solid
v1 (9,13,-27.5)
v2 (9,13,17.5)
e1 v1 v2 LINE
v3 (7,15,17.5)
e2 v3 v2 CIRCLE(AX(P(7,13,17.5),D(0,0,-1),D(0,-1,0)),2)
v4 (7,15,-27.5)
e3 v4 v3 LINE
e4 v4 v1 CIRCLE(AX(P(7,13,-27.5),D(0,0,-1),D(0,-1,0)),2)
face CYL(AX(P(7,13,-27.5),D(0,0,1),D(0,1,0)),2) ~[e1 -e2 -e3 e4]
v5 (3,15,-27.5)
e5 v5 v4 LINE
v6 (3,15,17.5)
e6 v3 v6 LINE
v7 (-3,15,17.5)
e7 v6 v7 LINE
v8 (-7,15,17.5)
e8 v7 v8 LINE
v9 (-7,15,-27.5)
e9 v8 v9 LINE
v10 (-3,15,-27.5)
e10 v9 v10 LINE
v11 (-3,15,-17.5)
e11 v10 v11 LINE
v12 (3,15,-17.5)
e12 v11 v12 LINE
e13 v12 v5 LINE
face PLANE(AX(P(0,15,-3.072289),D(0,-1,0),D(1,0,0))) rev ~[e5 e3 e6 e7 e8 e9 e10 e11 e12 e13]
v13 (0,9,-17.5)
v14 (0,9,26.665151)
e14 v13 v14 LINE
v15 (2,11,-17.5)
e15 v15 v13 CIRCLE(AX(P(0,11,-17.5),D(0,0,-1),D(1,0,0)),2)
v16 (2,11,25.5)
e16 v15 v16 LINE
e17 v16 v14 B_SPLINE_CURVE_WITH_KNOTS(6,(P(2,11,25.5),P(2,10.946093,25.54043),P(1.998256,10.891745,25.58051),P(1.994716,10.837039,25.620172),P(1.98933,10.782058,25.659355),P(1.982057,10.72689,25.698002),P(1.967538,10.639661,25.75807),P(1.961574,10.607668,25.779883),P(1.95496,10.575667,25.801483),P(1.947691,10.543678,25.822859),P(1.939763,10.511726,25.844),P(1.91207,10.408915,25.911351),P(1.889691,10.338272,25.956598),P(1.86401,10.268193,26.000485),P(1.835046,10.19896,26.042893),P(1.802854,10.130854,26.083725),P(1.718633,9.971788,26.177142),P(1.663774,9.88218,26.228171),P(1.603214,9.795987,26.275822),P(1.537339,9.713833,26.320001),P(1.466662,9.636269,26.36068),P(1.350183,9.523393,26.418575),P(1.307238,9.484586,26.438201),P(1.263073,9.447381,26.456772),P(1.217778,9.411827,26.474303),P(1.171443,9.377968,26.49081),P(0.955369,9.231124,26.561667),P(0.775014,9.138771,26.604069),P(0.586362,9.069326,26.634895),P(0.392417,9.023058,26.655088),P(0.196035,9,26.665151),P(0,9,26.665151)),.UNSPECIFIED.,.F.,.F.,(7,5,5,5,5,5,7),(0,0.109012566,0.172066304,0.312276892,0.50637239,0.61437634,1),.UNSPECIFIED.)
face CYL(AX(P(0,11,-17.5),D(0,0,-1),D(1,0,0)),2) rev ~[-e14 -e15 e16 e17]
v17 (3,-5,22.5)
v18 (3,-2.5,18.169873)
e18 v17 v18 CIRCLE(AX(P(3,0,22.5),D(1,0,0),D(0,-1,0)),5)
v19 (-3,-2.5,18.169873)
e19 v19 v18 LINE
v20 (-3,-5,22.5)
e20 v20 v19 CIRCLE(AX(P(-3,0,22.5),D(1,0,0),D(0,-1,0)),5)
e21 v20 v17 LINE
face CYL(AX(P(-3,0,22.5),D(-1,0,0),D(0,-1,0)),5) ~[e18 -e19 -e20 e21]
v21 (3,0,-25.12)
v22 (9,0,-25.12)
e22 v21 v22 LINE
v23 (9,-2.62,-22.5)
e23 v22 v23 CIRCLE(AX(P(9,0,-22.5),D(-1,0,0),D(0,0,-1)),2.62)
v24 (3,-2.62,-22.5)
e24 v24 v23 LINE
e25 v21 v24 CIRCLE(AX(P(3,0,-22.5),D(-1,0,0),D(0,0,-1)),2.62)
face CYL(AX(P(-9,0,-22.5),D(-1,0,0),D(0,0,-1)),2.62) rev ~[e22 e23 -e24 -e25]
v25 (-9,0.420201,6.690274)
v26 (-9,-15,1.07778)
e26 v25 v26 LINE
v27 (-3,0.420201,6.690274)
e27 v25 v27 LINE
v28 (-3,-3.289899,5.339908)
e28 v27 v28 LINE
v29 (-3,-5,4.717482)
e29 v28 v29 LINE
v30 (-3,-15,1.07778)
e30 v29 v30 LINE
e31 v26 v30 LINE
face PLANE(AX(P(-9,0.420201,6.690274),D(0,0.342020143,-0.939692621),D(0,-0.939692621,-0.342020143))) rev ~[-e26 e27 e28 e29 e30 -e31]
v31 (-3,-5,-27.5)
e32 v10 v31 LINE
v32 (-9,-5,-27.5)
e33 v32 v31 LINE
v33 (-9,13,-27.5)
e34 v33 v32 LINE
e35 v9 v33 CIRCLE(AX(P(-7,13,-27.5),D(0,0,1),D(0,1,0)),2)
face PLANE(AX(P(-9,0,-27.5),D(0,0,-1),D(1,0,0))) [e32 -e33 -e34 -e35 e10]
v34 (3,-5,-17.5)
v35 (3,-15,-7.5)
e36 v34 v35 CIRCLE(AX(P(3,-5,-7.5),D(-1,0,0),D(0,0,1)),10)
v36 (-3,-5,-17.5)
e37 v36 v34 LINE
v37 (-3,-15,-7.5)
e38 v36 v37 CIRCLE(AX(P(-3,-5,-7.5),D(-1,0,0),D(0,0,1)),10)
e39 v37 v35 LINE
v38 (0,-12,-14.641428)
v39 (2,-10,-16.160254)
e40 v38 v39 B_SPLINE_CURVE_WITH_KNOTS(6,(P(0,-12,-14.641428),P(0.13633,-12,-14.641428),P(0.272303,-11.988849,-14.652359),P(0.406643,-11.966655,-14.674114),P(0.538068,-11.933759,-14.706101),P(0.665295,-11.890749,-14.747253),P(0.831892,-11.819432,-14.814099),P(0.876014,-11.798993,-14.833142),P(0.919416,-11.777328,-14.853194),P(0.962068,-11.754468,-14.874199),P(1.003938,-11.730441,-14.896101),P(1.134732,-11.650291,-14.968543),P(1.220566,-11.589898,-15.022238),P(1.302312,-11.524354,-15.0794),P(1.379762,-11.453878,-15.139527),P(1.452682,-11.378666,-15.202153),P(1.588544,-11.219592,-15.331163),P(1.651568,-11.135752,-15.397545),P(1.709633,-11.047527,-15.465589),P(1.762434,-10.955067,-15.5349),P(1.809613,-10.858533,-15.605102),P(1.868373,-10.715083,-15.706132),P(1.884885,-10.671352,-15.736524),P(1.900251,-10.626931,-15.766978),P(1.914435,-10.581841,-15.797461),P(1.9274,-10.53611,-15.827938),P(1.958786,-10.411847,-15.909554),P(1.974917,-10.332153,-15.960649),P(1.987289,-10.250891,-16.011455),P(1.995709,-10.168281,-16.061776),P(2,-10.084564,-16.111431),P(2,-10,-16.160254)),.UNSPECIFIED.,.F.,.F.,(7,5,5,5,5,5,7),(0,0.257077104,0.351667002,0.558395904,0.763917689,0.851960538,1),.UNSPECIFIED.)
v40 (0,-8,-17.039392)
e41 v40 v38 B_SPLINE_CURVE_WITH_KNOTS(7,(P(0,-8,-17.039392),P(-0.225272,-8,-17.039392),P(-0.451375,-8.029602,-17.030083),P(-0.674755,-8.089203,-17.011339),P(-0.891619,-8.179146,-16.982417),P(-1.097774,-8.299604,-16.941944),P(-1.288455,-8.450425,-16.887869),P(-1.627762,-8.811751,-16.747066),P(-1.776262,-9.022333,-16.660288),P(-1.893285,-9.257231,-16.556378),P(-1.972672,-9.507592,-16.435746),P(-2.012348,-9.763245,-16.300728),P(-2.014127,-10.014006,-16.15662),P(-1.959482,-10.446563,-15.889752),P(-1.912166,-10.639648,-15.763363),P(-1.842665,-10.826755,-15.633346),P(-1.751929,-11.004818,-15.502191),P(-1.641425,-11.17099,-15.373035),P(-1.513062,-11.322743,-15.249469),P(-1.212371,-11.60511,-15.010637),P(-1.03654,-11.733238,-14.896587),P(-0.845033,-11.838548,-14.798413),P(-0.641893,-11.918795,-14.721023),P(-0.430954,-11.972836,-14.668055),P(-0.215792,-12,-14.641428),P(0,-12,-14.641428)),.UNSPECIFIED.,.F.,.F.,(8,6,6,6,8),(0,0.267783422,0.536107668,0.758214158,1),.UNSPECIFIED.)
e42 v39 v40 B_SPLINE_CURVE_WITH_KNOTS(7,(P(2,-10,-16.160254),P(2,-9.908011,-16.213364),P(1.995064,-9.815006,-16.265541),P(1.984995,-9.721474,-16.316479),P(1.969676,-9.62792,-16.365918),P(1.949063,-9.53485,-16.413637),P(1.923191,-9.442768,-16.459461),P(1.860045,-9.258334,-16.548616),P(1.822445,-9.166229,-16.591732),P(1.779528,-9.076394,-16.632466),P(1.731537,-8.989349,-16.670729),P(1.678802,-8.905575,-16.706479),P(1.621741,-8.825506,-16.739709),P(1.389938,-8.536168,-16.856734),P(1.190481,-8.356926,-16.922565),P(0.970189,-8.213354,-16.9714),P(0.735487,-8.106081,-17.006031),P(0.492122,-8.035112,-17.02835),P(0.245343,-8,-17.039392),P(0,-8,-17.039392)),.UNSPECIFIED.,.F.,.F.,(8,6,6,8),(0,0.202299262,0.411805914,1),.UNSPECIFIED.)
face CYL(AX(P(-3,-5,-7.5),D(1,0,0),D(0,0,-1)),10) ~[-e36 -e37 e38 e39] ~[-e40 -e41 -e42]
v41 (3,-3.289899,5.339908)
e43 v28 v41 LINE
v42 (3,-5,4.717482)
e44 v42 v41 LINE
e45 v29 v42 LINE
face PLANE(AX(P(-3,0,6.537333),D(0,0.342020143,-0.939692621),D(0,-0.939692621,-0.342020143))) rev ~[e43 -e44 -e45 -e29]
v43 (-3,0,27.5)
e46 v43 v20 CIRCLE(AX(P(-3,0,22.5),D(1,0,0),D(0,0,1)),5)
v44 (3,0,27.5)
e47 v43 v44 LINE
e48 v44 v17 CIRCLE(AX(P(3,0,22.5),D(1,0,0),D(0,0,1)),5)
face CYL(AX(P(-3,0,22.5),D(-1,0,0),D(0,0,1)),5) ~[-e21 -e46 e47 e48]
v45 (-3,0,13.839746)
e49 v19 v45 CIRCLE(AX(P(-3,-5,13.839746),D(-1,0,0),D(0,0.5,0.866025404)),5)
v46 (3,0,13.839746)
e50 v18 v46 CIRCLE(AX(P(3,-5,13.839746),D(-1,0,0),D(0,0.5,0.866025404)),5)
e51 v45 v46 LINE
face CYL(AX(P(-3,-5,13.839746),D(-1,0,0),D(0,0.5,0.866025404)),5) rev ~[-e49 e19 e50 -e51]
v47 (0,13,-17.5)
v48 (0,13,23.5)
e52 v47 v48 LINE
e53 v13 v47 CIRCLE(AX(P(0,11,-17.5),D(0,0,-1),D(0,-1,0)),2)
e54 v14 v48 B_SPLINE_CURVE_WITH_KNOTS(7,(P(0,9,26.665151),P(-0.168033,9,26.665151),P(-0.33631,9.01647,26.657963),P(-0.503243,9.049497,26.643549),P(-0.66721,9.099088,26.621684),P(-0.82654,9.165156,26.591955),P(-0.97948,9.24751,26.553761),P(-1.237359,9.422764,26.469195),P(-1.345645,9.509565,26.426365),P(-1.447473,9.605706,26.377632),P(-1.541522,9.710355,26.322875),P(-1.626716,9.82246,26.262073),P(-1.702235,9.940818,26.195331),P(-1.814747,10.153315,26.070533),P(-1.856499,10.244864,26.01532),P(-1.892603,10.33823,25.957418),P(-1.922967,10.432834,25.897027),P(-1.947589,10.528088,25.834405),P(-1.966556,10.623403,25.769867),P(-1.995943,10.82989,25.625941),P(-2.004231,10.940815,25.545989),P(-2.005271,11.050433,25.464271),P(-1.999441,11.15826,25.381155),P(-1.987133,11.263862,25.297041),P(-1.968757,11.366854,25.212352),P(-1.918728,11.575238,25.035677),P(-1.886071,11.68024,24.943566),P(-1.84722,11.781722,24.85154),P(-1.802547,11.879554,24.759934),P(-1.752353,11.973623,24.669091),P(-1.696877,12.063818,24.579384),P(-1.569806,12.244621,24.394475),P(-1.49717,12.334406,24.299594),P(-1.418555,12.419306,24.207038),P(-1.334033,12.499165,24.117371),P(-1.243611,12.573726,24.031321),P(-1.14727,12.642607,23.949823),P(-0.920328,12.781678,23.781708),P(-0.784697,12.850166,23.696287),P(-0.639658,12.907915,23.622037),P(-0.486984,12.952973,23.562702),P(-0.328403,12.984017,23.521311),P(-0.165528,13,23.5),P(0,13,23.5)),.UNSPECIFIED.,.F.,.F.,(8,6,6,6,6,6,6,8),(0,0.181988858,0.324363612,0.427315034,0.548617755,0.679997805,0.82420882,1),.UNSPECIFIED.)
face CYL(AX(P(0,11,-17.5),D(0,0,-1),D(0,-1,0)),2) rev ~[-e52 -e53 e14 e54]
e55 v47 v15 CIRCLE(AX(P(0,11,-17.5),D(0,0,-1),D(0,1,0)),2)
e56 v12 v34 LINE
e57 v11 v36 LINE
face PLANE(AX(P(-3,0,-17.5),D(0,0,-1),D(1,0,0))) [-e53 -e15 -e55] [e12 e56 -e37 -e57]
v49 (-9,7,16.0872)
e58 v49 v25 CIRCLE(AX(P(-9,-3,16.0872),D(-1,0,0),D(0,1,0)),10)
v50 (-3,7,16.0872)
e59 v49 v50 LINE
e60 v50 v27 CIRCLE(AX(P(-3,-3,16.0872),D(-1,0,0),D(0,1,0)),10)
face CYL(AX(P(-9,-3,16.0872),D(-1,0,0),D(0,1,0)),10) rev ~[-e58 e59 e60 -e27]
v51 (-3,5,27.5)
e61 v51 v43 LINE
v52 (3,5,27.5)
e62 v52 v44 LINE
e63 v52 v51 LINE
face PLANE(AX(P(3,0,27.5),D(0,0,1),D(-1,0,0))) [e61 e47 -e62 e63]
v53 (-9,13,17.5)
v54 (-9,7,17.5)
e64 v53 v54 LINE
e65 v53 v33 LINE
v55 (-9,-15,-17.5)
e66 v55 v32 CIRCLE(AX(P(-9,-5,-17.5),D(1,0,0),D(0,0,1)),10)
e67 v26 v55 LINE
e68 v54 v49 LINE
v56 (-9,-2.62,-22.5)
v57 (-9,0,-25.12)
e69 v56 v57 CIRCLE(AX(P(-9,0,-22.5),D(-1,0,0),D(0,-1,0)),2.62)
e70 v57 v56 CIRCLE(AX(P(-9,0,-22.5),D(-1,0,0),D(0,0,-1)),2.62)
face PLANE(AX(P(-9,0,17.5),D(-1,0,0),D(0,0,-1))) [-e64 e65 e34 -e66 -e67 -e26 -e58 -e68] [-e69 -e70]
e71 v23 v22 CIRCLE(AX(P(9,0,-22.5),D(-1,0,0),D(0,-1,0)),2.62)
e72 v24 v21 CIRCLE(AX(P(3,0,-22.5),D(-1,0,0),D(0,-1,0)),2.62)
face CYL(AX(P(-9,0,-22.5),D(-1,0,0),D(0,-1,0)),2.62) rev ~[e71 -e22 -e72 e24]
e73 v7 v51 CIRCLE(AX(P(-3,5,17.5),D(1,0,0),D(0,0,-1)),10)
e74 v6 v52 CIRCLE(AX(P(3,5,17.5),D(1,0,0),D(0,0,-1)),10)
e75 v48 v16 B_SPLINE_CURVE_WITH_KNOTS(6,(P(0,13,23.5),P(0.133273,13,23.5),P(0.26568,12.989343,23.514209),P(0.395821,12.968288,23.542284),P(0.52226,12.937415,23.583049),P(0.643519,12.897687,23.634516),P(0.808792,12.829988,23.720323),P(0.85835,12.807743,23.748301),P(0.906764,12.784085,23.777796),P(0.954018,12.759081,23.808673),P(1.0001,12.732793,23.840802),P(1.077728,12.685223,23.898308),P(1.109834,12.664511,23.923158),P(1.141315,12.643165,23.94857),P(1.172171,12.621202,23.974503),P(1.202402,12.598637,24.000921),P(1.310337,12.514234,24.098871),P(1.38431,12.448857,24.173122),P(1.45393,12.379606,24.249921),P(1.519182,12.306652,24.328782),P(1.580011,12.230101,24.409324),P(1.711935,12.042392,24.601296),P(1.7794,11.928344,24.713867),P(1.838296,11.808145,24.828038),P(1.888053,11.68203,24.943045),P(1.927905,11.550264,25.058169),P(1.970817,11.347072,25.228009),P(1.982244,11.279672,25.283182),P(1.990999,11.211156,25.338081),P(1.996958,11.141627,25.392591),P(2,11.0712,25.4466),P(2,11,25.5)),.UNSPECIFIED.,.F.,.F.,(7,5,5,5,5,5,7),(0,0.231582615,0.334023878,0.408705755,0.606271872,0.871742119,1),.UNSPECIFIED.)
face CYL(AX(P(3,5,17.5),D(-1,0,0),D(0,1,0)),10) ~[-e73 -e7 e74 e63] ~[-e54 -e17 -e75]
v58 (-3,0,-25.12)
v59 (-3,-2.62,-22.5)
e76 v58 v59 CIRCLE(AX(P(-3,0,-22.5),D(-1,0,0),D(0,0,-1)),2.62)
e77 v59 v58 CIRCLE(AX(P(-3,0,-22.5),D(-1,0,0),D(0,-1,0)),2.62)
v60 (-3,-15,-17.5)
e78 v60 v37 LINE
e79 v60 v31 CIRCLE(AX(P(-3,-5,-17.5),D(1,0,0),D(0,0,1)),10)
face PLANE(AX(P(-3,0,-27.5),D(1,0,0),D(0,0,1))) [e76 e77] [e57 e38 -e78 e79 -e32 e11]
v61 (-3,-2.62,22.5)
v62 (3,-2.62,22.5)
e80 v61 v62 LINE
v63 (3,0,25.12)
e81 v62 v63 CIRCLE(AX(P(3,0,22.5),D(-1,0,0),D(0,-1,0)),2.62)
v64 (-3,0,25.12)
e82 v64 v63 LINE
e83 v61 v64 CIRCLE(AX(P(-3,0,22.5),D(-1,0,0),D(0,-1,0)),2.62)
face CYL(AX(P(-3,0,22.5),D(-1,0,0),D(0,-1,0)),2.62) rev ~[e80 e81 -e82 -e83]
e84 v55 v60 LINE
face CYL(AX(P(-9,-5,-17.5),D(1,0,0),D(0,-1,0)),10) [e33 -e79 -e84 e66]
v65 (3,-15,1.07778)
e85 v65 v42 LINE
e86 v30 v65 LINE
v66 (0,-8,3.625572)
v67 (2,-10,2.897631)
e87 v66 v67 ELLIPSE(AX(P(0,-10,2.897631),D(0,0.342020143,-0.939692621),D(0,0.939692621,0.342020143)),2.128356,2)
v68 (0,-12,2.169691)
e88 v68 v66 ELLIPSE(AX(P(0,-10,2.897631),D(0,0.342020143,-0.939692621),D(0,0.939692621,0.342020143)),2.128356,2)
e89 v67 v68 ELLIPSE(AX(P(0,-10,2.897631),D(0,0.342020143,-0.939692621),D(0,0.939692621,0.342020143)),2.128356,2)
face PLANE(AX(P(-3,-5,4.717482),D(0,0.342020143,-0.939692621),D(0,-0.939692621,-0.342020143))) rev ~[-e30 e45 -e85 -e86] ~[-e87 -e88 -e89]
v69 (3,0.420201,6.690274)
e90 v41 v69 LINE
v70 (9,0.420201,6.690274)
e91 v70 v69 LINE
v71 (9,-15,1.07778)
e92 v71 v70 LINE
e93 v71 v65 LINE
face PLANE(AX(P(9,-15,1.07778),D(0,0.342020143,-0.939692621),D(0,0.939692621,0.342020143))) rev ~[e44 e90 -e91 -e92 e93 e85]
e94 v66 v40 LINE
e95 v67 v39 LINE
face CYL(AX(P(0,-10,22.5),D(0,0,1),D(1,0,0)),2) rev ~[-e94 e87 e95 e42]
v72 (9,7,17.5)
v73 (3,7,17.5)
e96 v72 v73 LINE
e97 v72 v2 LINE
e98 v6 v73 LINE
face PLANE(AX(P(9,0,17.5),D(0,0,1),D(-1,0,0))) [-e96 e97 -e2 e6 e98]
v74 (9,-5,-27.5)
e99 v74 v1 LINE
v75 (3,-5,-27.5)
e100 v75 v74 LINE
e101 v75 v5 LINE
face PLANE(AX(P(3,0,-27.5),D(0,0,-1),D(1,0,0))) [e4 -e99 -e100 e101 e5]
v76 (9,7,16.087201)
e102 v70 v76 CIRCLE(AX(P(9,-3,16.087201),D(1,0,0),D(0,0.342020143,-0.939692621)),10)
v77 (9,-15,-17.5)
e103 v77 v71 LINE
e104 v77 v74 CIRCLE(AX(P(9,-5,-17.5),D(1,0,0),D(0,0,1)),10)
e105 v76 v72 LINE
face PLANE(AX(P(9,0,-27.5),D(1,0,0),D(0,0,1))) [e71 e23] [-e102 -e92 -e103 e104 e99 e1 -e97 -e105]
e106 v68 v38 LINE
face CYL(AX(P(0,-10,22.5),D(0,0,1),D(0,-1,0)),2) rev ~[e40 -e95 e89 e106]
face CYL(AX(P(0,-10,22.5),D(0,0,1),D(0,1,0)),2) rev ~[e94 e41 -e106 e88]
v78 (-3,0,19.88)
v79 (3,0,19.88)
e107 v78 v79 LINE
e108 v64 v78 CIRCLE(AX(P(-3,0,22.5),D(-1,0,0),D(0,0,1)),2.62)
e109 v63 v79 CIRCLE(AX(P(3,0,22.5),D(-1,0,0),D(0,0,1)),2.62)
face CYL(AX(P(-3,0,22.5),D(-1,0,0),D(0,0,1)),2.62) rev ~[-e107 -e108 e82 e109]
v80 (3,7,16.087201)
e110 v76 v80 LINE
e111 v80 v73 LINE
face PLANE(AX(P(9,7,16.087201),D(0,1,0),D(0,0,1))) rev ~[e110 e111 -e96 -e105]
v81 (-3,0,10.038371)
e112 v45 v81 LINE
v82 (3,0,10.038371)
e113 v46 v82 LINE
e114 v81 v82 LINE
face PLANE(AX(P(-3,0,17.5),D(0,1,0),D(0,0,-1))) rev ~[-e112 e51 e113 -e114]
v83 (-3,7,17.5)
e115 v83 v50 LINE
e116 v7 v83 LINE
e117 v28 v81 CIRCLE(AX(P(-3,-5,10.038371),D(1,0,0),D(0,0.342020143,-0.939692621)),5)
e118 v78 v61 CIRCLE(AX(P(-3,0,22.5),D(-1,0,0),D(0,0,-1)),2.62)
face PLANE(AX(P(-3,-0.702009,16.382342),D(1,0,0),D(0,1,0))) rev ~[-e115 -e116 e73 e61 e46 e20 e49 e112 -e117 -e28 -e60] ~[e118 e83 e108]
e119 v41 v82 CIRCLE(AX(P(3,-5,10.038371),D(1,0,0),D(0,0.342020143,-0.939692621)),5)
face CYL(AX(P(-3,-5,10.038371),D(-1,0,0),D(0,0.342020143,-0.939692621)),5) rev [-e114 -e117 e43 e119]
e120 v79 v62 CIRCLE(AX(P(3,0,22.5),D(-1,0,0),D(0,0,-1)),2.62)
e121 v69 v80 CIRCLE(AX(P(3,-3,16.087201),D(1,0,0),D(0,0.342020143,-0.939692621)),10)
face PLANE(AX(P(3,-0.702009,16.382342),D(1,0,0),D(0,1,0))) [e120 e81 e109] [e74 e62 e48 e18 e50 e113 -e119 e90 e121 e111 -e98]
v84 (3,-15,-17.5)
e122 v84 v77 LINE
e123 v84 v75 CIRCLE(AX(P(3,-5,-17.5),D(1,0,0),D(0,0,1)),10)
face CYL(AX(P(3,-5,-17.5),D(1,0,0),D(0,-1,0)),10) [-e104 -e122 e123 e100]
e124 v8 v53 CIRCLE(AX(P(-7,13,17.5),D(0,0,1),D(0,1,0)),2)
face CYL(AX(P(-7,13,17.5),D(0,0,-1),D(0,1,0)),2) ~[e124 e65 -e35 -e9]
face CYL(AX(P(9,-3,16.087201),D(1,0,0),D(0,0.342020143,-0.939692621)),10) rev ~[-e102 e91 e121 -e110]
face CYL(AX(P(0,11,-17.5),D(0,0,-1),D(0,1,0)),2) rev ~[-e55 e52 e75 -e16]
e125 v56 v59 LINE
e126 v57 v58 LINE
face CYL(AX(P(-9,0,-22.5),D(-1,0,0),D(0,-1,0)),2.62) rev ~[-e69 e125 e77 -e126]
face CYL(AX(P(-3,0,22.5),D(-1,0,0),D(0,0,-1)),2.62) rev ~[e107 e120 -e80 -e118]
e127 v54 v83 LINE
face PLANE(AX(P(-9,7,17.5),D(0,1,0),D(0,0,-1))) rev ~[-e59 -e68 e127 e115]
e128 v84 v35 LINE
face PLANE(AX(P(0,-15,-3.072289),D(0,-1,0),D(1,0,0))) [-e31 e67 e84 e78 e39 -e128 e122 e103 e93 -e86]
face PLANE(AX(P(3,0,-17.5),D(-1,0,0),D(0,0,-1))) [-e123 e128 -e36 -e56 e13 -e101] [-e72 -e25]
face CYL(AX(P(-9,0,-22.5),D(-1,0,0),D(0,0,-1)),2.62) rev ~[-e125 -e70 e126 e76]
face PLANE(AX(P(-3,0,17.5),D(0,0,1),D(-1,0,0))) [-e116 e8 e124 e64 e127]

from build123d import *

# Parameters (mm, degrees)
F1_DEPTH     = 15
F3_DEPTH     = 6
F5_DEPTH     = 18
F6_R         = 10
F9_DEPTH     = 6
F10_DEPTH    = 6
F11_R        = 2
F13_DEPTH    = 6
F15_R        = 10
F18_DEPTH    = 40
F20_DEPTH    = 45
F22_DEPTH    = 6
F23_T1_DEPTH = 6


# Not quite as in the source:
# - a fillet or chamfer that OpenCascade refuses, or shapes differently, is made with other operations: its cross-section is extruded or revolved along the edge and cut away or added


with BuildPart() as f1:
    # F0 (on Front) → F1 (new body, symmetric)
    with BuildSketch(Plane.XZ):
        Polygon((9, -17.5), (9, 17.5), (3, 17.5), (3, 27.5), (-3, 27.5), (-3, 17.5), (-9, 17.5), (-9, -17.5), (-9, -27.5), (-3, -27.5), (-3, -17.5), (3, -17.5), (3, -27.5), (9, -27.5), align=None)
    extrude(amount=F1_DEPTH, both=True)

    # F2 (on face) → F3 (cut)
    with BuildSketch(Plane(origin=(-3, 0, 0), x_dir=(0, -1, 0), z_dir=(-1, 0, 0))):
        with BuildLine():
            ThreePointArc((0, 25.12), (-2.62, 22.5), (0, 19.88))
            Line((0, 19.88), (0, 25.12))
        make_face()
        with BuildLine():
            Line((0, 25.12), (0, 19.88))
            ThreePointArc((0, 19.88), (1.8526197667, 20.6473802333), (2.62, 22.5))
            ThreePointArc((2.62, 22.5), (1.8526197667, 24.3526197667), (0, 25.12))
        make_face()
    extrude(amount=-F3_DEPTH, mode=Mode.SUBTRACT)

    # F4 (on face) → F5 (cut)
    with BuildSketch(Plane(origin=(-9, 0, 0), x_dir=(0, -1, 0), z_dir=(-1, 0, 0))):
        with BuildLine():
            ThreePointArc((0, -25.12), (1.8526197667, -24.3526197667), (2.62, -22.5))
            ThreePointArc((2.62, -22.5), (-1.8526197667, -20.6473802333), (0, -25.12))
        make_face()
    extrude(amount=-F5_DEPTH, mode=Mode.SUBTRACT)

    # F6
    f6_edges = [f1.edges().sort_by_distance(p)[0] for p in [
        (0, 15, 27.5),
        (0, -15, 27.5),
        (6, -15, -27.5),
        (-6, -15, -27.5),
    ]]
    fillet(f6_edges, radius=F6_R)

    # F8 (on face) → F9 (cut)
    with BuildSketch(Plane(origin=(-9, 0, 0), x_dir=(0, -1, 0), z_dir=(-1, 0, 0))):
        with BuildLine():
            ThreePointArc((-7, 16.0872004348), (-5.1915204429, 10.3514360713), (-0.4202014333, 6.690274227))
            Line((-0.4202014333, 6.690274227), (15, 1.0777798989))
            Line((15, 1.0777798989), (15, 17.5))
            Line((15, 17.5), (-7, 17.5))
            Line((-7, 17.5), (-7, 16.0872004348))
        make_face()
    extrude(amount=-F9_DEPTH, mode=Mode.SUBTRACT)

    # F7 (on face) → F10 (cut)
    with BuildSketch(Plane.YZ.offset(9)):
        with BuildLine():
            Line((7, 17.5), (-15, 17.5))
            Line((-15, 17.5), (-15, 1.07778))
            Line((-15, 1.07778), (0.4202014333, 6.6902743281))
            ThreePointArc((0.4202014333, 6.6902743281), (5.1915204429, 10.3514361724), (7, 16.087200536))
            Line((7, 16.087200536), (7, 17.5))
        make_face()
    extrude(amount=-F10_DEPTH, mode=Mode.SUBTRACT)

    # F11
    f11_edges = [f1.edges().sort_by_distance(p)[0] for p in [
        (9, 15, -5),
        (-9, 15, -5),
    ]]
    fillet(f11_edges, radius=F11_R)

    # F12 (on face) → F13 (cut)
    with BuildSketch(Plane(origin=(-3, 0, 0), x_dir=(0, -1, 0), z_dir=(-1, 0, 0))):
        with BuildLine():
            Line((5, 27.5), (0, 27.5))
            ThreePointArc((0, 27.5), (3.5355339059, 26.0355339059), (5, 22.5))
            Line((5, 22.5), (5, 4.7174822415))
            Line((5, 4.7174822415), (15, 1.0777798989))
            Line((15, 1.0777798989), (15, 17.5))
            ThreePointArc((15, 17.5), (12.0710678119, 24.5710678119), (5, 27.5))
        make_face()
    extrude(amount=-F13_DEPTH, mode=Mode.SUBTRACT)

    # F15
    f15_edges = [f1.edges().sort_by_distance(p)[0] for p in [
        (0, -15, -17.5),
    ]]
    fillet(f15_edges, radius=F15_R)

    # F17 (on face) → F18 (cut)
    with BuildSketch(Plane.XY.offset(22.5)):
        with BuildLine():
            ThreePointArc((2, -10), (1.4142135624, -8.5857864376), (0, -8))
            Line((0, -8), (0, -12))
            ThreePointArc((0, -12), (1.4142135624, -11.4142135624), (2, -10))
        make_face()
        with BuildLine():
            Line((0, -12), (0, -8))
            ThreePointArc((0, -8), (-2, -10), (0, -12))
        make_face()
    extrude(amount=-F18_DEPTH, mode=Mode.SUBTRACT)

    # F19 (on face) → F20 (cut)
    with BuildSketch(Plane(origin=(0, 0, -17.5), x_dir=(1, 0, 0), z_dir=(0, 0, -1))):
        with BuildLine():
            ThreePointArc((0, -9), (-2, -11), (0, -13))
            Line((0, -13), (0, -11))
            Line((0, -11), (0, -9))
        make_face()
        with BuildLine():
            Line((0, -11), (0, -13))
            ThreePointArc((0, -13), (1.4142135624, -12.4142135624), (2, -11))
            ThreePointArc((2, -11), (1.4142135624, -9.5857864376), (0, -9))
            Line((0, -9), (0, -11))
        make_face()
    extrude(amount=-F20_DEPTH, mode=Mode.SUBTRACT)

    # F21 (on face) → F22 (cut)
    with BuildSketch(Plane(origin=(-3, 0, 0), x_dir=(0, -1, 0), z_dir=(-1, 0, 0))):
        with BuildLine():
            ThreePointArc((5, 22.5), (3.5355339059, 18.9644660941), (0, 17.5))
            Line((0, 17.5), (0, 6.5373334129))
            Line((0, 6.5373334129), (5, 4.7174822415))
            Line((5, 4.7174822415), (5, 22.5))
        make_face()
    extrude(amount=-F22_DEPTH, mode=Mode.SUBTRACT)

    # F23: fillet of radius 5 on 2 edges, made by hand

    # F23_s2 → F23_t1 (join)
    with BuildSketch(Plane.YZ.offset(-3)):
        with BuildLine():
            ThreePointArc((-2.5, 18.1698729811), (-0.6698729811, 16.3397459622), (0, 13.8397459622))
            Line((0, 13.8397459622), (0, 17.5))
            ThreePointArc((0, 17.5), (-1.2940952255, 17.6703708686), (-2.5, 18.1698729811))
        make_face()
        with BuildLine():
            ThreePointArc((-3.2898992834, 5.3399081011), (-0.9042397786, 7.1704890233), (0, 10.038371205))
            Line((0, 10.038371205), (0, 6.5373334129))
            Line((0, 6.5373334129), (-3.2898992834, 5.3399081011))
        make_face()
    extrude(amount=F23_T1_DEPTH)


solid = f1.part
